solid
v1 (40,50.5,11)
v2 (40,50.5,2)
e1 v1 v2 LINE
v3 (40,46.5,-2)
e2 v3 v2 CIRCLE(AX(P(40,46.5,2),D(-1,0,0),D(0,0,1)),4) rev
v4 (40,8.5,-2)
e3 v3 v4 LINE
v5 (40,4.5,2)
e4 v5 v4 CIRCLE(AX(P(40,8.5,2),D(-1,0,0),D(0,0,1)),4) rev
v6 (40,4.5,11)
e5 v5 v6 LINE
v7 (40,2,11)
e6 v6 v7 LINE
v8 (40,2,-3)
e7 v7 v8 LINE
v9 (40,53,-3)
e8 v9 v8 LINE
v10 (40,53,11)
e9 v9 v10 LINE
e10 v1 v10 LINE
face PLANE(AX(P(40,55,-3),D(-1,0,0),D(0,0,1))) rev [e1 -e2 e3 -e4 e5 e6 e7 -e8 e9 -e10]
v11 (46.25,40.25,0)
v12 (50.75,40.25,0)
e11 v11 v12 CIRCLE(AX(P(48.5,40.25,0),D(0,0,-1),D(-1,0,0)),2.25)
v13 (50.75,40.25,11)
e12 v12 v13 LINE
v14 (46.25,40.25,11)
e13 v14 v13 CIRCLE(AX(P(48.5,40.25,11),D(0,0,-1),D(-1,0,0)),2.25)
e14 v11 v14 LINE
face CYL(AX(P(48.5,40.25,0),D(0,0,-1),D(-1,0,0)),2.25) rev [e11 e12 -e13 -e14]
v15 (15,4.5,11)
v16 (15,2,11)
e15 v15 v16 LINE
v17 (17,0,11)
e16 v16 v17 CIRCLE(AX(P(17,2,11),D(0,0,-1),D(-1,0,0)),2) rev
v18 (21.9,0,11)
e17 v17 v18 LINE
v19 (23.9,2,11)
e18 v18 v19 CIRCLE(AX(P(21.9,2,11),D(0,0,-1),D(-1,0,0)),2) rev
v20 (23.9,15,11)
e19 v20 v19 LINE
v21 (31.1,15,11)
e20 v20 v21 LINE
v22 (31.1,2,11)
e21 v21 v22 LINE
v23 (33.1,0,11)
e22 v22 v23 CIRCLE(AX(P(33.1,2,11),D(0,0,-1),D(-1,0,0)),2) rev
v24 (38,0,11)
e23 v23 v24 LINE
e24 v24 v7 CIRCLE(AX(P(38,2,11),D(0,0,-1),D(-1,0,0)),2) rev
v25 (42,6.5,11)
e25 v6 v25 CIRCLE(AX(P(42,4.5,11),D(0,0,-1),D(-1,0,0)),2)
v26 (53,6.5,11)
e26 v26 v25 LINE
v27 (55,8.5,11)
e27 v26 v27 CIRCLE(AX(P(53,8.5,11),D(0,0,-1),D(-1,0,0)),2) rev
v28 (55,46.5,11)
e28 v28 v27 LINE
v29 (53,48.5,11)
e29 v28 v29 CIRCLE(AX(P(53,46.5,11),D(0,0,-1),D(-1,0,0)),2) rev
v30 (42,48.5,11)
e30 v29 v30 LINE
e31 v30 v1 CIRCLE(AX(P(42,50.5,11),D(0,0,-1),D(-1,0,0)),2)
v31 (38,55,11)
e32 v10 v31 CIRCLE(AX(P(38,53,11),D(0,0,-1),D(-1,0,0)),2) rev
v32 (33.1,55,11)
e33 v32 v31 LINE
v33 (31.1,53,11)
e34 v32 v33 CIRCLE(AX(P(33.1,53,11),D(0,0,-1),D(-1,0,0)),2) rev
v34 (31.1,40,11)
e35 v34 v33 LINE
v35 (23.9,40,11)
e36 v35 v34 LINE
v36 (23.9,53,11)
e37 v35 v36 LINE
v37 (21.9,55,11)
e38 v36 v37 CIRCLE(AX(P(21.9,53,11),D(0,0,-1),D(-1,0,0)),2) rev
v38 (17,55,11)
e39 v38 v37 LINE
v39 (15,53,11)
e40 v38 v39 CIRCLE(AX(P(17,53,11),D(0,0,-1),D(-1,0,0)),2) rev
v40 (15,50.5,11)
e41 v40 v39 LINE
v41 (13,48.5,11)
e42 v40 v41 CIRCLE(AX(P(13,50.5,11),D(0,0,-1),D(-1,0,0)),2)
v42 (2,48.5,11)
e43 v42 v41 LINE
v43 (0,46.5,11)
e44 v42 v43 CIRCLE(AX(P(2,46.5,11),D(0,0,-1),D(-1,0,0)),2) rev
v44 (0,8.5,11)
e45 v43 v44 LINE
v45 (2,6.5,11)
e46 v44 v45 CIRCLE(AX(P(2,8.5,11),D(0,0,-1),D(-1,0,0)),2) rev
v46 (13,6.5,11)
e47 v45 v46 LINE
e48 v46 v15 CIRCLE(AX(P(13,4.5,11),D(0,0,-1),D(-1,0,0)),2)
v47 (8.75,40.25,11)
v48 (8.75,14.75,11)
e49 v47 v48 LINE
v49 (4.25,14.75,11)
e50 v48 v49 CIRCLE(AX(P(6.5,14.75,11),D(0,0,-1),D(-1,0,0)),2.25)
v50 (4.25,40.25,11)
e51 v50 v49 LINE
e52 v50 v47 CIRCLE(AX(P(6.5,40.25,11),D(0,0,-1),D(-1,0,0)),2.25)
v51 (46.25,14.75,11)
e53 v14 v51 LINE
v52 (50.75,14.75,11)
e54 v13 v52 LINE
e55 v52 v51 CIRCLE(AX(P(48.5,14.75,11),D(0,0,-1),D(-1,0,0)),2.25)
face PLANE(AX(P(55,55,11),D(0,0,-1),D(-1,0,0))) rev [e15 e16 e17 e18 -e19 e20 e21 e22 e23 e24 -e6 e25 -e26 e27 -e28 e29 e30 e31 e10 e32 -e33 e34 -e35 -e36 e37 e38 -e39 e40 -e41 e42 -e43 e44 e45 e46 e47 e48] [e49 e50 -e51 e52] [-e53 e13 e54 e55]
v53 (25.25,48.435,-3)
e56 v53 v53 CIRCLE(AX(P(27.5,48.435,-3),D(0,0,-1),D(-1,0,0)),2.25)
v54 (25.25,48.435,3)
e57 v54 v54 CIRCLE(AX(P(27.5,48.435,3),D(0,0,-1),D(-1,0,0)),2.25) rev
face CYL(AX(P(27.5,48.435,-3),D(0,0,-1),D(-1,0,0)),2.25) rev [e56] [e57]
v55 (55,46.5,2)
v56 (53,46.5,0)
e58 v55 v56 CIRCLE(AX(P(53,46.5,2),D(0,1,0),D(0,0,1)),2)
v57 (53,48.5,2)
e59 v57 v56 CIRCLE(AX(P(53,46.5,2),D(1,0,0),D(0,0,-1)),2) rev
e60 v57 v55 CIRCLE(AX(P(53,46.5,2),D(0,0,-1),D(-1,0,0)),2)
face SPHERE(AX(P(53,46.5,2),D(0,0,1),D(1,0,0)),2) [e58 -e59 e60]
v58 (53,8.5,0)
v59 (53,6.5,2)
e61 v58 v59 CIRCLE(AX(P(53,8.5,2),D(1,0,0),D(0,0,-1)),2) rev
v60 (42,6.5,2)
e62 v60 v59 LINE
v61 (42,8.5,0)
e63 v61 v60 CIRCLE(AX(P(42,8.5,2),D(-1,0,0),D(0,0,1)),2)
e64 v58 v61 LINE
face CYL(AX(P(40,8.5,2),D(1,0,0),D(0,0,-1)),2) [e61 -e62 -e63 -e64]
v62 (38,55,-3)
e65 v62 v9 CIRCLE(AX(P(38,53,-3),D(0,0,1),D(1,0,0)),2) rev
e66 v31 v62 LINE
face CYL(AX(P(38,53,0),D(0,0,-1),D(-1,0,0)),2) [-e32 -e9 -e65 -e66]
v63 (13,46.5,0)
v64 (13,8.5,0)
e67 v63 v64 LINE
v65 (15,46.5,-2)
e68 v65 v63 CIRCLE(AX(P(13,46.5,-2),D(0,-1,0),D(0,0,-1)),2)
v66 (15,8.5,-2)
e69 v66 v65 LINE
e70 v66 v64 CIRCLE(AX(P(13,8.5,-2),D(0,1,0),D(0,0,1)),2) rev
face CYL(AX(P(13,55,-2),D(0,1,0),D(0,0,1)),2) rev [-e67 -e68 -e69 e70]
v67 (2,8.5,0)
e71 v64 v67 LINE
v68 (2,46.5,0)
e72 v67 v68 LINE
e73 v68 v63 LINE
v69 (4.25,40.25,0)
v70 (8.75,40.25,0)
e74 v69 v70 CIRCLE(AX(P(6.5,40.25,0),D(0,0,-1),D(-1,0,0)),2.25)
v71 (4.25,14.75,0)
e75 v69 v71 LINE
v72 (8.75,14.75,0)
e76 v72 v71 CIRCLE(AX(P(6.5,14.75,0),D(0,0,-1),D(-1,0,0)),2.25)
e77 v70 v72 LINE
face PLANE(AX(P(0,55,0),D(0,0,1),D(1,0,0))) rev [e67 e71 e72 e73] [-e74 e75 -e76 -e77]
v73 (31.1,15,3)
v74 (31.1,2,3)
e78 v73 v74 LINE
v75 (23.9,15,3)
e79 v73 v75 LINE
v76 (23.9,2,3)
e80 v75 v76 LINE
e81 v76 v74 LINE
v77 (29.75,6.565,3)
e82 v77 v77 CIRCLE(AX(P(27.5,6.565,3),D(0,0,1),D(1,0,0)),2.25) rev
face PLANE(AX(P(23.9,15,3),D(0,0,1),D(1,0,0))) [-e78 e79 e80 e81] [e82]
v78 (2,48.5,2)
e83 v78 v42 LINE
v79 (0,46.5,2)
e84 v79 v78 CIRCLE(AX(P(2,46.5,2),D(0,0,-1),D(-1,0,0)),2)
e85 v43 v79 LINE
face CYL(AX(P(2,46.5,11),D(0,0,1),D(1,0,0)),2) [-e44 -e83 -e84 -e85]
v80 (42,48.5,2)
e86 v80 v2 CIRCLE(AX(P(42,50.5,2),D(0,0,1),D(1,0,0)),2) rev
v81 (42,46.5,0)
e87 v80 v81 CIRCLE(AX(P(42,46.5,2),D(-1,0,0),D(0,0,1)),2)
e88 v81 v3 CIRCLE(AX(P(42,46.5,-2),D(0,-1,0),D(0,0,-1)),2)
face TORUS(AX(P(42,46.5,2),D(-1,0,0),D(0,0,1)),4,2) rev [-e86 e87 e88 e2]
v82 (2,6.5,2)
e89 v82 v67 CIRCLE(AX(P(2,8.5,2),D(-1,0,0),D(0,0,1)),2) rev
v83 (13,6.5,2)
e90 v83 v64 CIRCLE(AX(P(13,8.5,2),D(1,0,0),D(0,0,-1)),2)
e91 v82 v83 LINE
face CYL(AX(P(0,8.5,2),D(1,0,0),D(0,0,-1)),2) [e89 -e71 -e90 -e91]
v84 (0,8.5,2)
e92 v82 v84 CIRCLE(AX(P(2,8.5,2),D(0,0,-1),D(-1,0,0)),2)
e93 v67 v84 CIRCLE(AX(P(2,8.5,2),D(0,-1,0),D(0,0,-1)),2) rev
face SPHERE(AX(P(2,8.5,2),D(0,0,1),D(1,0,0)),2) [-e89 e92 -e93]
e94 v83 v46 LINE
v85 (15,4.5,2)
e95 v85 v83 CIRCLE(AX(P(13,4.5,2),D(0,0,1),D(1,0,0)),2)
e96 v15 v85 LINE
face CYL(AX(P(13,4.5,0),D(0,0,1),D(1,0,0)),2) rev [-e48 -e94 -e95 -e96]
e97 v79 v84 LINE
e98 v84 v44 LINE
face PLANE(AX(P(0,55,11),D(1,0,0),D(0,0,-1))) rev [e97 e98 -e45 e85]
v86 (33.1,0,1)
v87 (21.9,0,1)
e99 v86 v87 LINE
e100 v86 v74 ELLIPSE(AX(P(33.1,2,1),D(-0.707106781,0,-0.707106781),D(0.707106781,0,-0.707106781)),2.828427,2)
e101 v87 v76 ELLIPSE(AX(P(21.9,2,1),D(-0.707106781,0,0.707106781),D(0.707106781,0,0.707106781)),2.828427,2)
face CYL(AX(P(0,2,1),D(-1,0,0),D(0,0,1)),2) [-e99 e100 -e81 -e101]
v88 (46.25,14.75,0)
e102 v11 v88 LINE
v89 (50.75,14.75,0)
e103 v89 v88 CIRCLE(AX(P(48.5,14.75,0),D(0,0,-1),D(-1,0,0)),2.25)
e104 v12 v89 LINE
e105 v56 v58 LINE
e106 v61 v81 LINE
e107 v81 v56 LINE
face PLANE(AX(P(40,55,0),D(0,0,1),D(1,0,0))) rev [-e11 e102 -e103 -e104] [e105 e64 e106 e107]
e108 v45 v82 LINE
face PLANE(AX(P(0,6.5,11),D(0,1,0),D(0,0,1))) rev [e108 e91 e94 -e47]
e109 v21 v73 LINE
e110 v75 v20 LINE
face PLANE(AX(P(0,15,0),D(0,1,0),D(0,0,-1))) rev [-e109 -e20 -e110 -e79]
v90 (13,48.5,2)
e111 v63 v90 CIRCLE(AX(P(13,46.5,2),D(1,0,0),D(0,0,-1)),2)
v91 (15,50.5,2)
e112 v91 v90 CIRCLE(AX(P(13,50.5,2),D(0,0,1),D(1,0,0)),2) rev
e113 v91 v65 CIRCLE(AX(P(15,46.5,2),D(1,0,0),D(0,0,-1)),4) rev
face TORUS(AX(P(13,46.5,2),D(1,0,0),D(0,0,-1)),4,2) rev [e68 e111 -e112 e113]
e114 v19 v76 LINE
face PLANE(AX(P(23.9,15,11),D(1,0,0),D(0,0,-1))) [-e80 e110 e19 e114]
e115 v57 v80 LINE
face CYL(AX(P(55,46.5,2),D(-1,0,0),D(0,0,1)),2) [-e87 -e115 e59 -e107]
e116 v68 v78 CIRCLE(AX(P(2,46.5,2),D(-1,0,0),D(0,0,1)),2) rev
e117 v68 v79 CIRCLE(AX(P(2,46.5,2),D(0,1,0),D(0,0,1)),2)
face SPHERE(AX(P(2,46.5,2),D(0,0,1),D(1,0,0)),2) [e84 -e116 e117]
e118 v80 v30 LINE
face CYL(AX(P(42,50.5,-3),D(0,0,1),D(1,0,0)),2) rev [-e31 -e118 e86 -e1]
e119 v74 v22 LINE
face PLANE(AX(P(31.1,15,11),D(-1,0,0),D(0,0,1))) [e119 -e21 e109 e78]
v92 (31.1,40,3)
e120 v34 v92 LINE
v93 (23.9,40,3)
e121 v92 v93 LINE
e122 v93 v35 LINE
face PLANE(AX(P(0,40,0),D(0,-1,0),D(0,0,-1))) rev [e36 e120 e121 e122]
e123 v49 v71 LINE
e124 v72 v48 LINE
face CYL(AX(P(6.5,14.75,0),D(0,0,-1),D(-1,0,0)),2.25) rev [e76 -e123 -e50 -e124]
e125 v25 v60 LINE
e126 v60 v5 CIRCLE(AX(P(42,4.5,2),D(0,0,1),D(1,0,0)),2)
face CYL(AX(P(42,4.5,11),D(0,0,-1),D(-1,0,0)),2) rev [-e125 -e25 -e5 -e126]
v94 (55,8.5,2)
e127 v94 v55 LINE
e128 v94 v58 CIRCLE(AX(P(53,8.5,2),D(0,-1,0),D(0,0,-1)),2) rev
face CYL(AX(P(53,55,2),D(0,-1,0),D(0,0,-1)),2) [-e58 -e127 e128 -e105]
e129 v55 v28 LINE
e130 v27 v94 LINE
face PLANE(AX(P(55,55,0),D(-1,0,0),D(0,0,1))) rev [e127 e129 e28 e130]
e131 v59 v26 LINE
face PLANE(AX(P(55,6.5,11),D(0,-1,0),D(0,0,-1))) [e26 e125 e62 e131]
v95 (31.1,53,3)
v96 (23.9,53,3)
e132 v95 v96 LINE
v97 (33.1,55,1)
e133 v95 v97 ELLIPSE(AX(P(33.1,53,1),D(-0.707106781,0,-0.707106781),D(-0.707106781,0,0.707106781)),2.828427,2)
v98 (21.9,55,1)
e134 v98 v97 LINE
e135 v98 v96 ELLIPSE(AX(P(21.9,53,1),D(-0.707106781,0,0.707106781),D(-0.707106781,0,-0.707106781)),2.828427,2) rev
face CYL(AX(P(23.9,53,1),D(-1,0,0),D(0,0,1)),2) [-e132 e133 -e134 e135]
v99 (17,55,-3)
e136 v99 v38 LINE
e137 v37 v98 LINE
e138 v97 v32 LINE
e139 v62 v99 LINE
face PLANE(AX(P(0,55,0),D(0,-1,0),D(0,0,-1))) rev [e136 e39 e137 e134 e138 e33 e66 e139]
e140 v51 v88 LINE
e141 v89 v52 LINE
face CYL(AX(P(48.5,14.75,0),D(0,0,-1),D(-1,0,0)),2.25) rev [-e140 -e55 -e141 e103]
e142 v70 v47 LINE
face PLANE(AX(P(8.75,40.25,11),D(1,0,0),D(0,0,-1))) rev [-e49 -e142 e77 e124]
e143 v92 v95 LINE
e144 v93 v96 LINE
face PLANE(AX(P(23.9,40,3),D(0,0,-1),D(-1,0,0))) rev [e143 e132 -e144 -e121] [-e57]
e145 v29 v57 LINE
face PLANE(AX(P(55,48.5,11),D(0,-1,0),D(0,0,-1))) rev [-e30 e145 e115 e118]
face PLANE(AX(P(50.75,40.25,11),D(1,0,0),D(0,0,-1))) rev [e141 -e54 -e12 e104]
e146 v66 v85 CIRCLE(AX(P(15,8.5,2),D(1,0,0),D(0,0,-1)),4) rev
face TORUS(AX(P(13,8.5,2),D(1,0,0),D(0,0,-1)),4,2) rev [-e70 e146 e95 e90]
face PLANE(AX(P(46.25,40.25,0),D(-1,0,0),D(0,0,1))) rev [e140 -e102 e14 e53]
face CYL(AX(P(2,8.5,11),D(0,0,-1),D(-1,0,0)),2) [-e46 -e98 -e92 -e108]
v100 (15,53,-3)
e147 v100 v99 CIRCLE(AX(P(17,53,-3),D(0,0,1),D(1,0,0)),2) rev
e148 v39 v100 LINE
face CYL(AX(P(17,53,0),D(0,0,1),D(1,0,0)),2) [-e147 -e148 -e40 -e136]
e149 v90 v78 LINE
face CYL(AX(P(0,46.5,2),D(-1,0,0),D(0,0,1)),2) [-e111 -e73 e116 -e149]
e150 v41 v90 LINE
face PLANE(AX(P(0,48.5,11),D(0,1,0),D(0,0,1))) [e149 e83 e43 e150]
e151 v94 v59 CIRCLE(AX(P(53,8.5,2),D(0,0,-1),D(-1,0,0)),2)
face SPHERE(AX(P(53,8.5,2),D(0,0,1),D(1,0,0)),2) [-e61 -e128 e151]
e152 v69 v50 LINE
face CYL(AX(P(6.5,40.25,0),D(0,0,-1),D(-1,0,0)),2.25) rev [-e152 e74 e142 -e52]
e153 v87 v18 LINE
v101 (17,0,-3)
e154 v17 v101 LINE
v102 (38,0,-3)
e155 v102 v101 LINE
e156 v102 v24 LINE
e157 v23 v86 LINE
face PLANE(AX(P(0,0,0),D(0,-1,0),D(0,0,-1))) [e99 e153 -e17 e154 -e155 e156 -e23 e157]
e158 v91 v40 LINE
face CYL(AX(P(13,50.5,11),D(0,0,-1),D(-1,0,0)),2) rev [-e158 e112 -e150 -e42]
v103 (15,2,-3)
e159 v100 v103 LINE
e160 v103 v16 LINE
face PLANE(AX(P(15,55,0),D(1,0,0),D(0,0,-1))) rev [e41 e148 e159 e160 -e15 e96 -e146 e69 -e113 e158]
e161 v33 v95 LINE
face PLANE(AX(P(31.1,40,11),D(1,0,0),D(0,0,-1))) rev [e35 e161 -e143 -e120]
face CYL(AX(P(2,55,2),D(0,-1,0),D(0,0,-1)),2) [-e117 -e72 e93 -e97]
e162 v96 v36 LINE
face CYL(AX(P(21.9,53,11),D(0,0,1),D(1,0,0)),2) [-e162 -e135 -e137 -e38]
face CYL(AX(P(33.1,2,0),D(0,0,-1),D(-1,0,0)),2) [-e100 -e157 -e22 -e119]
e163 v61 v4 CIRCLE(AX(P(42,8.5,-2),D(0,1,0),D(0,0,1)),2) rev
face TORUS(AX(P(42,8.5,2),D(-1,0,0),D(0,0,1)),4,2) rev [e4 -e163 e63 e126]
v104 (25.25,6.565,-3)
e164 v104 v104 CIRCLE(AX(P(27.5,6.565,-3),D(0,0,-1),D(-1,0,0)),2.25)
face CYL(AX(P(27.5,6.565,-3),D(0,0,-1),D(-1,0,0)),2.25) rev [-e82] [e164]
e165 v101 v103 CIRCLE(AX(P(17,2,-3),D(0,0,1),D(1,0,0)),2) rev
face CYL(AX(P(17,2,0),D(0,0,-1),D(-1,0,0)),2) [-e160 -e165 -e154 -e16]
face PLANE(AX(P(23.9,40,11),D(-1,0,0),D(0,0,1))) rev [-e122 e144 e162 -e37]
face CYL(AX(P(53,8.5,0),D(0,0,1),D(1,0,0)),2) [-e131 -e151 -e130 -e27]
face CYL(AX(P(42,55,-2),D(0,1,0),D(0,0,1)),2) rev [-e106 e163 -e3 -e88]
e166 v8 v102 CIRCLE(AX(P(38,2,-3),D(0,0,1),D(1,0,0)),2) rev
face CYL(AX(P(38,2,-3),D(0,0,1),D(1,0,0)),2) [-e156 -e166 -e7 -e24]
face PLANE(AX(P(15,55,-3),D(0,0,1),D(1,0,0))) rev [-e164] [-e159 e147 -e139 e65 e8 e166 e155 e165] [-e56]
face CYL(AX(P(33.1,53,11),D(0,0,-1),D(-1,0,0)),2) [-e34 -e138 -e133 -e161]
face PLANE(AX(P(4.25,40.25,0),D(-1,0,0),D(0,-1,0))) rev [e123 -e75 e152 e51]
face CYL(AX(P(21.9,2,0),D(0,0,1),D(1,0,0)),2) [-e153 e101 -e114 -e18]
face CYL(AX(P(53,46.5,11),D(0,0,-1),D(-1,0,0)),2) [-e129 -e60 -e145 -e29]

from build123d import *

# Parameters (mm, degrees)
BOSS_EXTRUDE1_DEPTH      = 55
M4_CLEARANCE_HOLE1_D     = 4.5
M4_CLEARANCE_SLOT1_DEPTH = 11
SKETCH6_W                = 7.2
SKETCH6_H                = 8
CUT_EXTRUDE1_DEPTH       = 15
SKETCH7_W                = 15
SKETCH7_H                = 6.5
CUT_EXTRUDE3_DEPTH       = 79.555712714
MIRROR3_COPY_1_SKETCH_W  = 15
MIRROR3_COPY_1_SKETCH_H  = 6.5
MIRROR3_COPY_1_DEPTH     = 79.555712714
FILLET1_R                = 2


# Read off the part's stored shape, not the designer's step: M4 Clearance Slot1
with BuildPart() as part:
    # Sketch1 → Boss-Extrude1 (new body)
    with BuildSketch(Plane(origin=(0, 0, 0), x_dir=(1, 0, 0), z_dir=(0, 1, 0))):
        Polygon((0, 0), (15, 0), (15, 3), (40, 3), (40, 0), (55, 0), (55, -11), (0, -11), align=None)
    extrude(amount=BOSS_EXTRUDE1_DEPTH)

    # M4 Clearance Hole1 (through all)
    with Locations(Plane(origin=(0, 0, -3), x_dir=(-1, 0, 0), z_dir=(0, 0, -1))):
        with Locations((-27.5, 48.435), (-27.5, 6.565)):
            Hole(M4_CLEARANCE_HOLE1_D / 2)

    # M4 Clearance Slot1 outline → M4 Clearance Slot1 (cut)
    with BuildSketch(Plane.XY):
        with BuildLine():
            ThreePointArc((46.25, 14.75), (48.5, 12.5), (50.75, 14.75))
            Line((50.75, 14.75), (50.75, 40.25))
            ThreePointArc((50.75, 40.25), (48.5, 42.5), (46.25, 40.25))
            Line((46.25, 40.25), (46.25, 14.75))
        make_face()
        with BuildLine():
            ThreePointArc((4.25, 14.75), (6.5, 12.5), (8.75, 14.75))
            Line((8.75, 14.75), (8.75, 40.25))
            ThreePointArc((8.75, 40.25), (6.5, 42.5), (4.25, 40.25))
            Line((4.25, 40.25), (4.25, 14.75))
        make_face()
    extrude(amount=M4_CLEARANCE_SLOT1_DEPTH, mode=Mode.SUBTRACT)

    # Sketch6 → Cut-Extrude1 (cut)
    with BuildSketch(Plane(origin=(0, 55, 0), x_dir=(1, 0, 0), z_dir=(0, 1, 0))):
        with Locations((27.5, -7)):
            Rectangle(SKETCH6_W, SKETCH6_H)
    cut_extrude1 = extrude(amount=-CUT_EXTRUDE1_DEPTH, mode=Mode.SUBTRACT)

    # Mirror1: Cut-Extrude1 across plane
    add(cut_extrude1.mirror(Plane.ZX.offset(27.5)), mode=Mode.SUBTRACT)

    # Sketch7 → Cut-Extrude3 (cut, through all)
    with BuildSketch(Plane(origin=(0, 0, 0), x_dir=(-1, 0, 0), z_dir=(0, 0, -1))):
        with Locations((-7.5, 3.25)):
            Rectangle(SKETCH7_W, SKETCH7_H)
    cut_extrude3 = extrude(amount=-CUT_EXTRUDE3_DEPTH, mode=Mode.SUBTRACT)

    # Mirror2: Cut-Extrude3 across plane
    add(cut_extrude3.mirror(Plane(origin=(0, 27.5, 0), x_dir=(0, 0, 1), z_dir=(0, -1, 0))), mode=Mode.SUBTRACT)

    # Mirror3: Cut-Extrude3 across plane
    add(cut_extrude3.mirror(Plane(origin=(27.5, 0, 0), x_dir=(0, 0, 1), z_dir=(1, 0, 0))), mode=Mode.SUBTRACT)

    # Mirror3 copy 1 sketch → Mirror3 copy 1 (cut, through all)
    with BuildSketch(Plane(origin=(55, 55, 0), x_dir=(1, 0, 0), z_dir=(0, 0, -1))):
        with Locations((-7.5, 3.25)):
            Rectangle(MIRROR3_COPY_1_SKETCH_W, MIRROR3_COPY_1_SKETCH_H)
    extrude(amount=-MIRROR3_COPY_1_DEPTH, mode=Mode.SUBTRACT)

    # Fillet1
    fillet1_edges = [part.edges().sort_by_distance(p)[0] for p in [
        (7.5, 6.5, 0),
        (15, 27.5, 0),
        (0, 27.5, 0),
        (15, 48.5, 5.5),
        (7.5, 48.5, 0),
        (0, 48.5, 5.5),
        (40, 27.5, 0),
        (55, 27.5, 0),
        (40, 48.5, 5.5),
        (55, 48.5, 5.5),
        (47.5, 48.5, 0),
        (40, 6.5, 5.5),
        (47.5, 6.5, 0),
        (55, 6.5, 5.5),
        (40, 55, 4),
        (15, 55, 4),
        (23.9, 55, 7),
        (31.1, 55, 7),
        (27.5, 55, 3),
        (27.5, 0, 3),
        (23.9, 0, 7),
        (31.1, 0, 7),
        (15, 0, 4),
        (40, 0, 4),
        (15, 6.5, 5.5),
        (0, 6.5, 5.5),
    ]]
    fillet(fillet1_edges, radius=FILLET1_R)


solid = part.part
